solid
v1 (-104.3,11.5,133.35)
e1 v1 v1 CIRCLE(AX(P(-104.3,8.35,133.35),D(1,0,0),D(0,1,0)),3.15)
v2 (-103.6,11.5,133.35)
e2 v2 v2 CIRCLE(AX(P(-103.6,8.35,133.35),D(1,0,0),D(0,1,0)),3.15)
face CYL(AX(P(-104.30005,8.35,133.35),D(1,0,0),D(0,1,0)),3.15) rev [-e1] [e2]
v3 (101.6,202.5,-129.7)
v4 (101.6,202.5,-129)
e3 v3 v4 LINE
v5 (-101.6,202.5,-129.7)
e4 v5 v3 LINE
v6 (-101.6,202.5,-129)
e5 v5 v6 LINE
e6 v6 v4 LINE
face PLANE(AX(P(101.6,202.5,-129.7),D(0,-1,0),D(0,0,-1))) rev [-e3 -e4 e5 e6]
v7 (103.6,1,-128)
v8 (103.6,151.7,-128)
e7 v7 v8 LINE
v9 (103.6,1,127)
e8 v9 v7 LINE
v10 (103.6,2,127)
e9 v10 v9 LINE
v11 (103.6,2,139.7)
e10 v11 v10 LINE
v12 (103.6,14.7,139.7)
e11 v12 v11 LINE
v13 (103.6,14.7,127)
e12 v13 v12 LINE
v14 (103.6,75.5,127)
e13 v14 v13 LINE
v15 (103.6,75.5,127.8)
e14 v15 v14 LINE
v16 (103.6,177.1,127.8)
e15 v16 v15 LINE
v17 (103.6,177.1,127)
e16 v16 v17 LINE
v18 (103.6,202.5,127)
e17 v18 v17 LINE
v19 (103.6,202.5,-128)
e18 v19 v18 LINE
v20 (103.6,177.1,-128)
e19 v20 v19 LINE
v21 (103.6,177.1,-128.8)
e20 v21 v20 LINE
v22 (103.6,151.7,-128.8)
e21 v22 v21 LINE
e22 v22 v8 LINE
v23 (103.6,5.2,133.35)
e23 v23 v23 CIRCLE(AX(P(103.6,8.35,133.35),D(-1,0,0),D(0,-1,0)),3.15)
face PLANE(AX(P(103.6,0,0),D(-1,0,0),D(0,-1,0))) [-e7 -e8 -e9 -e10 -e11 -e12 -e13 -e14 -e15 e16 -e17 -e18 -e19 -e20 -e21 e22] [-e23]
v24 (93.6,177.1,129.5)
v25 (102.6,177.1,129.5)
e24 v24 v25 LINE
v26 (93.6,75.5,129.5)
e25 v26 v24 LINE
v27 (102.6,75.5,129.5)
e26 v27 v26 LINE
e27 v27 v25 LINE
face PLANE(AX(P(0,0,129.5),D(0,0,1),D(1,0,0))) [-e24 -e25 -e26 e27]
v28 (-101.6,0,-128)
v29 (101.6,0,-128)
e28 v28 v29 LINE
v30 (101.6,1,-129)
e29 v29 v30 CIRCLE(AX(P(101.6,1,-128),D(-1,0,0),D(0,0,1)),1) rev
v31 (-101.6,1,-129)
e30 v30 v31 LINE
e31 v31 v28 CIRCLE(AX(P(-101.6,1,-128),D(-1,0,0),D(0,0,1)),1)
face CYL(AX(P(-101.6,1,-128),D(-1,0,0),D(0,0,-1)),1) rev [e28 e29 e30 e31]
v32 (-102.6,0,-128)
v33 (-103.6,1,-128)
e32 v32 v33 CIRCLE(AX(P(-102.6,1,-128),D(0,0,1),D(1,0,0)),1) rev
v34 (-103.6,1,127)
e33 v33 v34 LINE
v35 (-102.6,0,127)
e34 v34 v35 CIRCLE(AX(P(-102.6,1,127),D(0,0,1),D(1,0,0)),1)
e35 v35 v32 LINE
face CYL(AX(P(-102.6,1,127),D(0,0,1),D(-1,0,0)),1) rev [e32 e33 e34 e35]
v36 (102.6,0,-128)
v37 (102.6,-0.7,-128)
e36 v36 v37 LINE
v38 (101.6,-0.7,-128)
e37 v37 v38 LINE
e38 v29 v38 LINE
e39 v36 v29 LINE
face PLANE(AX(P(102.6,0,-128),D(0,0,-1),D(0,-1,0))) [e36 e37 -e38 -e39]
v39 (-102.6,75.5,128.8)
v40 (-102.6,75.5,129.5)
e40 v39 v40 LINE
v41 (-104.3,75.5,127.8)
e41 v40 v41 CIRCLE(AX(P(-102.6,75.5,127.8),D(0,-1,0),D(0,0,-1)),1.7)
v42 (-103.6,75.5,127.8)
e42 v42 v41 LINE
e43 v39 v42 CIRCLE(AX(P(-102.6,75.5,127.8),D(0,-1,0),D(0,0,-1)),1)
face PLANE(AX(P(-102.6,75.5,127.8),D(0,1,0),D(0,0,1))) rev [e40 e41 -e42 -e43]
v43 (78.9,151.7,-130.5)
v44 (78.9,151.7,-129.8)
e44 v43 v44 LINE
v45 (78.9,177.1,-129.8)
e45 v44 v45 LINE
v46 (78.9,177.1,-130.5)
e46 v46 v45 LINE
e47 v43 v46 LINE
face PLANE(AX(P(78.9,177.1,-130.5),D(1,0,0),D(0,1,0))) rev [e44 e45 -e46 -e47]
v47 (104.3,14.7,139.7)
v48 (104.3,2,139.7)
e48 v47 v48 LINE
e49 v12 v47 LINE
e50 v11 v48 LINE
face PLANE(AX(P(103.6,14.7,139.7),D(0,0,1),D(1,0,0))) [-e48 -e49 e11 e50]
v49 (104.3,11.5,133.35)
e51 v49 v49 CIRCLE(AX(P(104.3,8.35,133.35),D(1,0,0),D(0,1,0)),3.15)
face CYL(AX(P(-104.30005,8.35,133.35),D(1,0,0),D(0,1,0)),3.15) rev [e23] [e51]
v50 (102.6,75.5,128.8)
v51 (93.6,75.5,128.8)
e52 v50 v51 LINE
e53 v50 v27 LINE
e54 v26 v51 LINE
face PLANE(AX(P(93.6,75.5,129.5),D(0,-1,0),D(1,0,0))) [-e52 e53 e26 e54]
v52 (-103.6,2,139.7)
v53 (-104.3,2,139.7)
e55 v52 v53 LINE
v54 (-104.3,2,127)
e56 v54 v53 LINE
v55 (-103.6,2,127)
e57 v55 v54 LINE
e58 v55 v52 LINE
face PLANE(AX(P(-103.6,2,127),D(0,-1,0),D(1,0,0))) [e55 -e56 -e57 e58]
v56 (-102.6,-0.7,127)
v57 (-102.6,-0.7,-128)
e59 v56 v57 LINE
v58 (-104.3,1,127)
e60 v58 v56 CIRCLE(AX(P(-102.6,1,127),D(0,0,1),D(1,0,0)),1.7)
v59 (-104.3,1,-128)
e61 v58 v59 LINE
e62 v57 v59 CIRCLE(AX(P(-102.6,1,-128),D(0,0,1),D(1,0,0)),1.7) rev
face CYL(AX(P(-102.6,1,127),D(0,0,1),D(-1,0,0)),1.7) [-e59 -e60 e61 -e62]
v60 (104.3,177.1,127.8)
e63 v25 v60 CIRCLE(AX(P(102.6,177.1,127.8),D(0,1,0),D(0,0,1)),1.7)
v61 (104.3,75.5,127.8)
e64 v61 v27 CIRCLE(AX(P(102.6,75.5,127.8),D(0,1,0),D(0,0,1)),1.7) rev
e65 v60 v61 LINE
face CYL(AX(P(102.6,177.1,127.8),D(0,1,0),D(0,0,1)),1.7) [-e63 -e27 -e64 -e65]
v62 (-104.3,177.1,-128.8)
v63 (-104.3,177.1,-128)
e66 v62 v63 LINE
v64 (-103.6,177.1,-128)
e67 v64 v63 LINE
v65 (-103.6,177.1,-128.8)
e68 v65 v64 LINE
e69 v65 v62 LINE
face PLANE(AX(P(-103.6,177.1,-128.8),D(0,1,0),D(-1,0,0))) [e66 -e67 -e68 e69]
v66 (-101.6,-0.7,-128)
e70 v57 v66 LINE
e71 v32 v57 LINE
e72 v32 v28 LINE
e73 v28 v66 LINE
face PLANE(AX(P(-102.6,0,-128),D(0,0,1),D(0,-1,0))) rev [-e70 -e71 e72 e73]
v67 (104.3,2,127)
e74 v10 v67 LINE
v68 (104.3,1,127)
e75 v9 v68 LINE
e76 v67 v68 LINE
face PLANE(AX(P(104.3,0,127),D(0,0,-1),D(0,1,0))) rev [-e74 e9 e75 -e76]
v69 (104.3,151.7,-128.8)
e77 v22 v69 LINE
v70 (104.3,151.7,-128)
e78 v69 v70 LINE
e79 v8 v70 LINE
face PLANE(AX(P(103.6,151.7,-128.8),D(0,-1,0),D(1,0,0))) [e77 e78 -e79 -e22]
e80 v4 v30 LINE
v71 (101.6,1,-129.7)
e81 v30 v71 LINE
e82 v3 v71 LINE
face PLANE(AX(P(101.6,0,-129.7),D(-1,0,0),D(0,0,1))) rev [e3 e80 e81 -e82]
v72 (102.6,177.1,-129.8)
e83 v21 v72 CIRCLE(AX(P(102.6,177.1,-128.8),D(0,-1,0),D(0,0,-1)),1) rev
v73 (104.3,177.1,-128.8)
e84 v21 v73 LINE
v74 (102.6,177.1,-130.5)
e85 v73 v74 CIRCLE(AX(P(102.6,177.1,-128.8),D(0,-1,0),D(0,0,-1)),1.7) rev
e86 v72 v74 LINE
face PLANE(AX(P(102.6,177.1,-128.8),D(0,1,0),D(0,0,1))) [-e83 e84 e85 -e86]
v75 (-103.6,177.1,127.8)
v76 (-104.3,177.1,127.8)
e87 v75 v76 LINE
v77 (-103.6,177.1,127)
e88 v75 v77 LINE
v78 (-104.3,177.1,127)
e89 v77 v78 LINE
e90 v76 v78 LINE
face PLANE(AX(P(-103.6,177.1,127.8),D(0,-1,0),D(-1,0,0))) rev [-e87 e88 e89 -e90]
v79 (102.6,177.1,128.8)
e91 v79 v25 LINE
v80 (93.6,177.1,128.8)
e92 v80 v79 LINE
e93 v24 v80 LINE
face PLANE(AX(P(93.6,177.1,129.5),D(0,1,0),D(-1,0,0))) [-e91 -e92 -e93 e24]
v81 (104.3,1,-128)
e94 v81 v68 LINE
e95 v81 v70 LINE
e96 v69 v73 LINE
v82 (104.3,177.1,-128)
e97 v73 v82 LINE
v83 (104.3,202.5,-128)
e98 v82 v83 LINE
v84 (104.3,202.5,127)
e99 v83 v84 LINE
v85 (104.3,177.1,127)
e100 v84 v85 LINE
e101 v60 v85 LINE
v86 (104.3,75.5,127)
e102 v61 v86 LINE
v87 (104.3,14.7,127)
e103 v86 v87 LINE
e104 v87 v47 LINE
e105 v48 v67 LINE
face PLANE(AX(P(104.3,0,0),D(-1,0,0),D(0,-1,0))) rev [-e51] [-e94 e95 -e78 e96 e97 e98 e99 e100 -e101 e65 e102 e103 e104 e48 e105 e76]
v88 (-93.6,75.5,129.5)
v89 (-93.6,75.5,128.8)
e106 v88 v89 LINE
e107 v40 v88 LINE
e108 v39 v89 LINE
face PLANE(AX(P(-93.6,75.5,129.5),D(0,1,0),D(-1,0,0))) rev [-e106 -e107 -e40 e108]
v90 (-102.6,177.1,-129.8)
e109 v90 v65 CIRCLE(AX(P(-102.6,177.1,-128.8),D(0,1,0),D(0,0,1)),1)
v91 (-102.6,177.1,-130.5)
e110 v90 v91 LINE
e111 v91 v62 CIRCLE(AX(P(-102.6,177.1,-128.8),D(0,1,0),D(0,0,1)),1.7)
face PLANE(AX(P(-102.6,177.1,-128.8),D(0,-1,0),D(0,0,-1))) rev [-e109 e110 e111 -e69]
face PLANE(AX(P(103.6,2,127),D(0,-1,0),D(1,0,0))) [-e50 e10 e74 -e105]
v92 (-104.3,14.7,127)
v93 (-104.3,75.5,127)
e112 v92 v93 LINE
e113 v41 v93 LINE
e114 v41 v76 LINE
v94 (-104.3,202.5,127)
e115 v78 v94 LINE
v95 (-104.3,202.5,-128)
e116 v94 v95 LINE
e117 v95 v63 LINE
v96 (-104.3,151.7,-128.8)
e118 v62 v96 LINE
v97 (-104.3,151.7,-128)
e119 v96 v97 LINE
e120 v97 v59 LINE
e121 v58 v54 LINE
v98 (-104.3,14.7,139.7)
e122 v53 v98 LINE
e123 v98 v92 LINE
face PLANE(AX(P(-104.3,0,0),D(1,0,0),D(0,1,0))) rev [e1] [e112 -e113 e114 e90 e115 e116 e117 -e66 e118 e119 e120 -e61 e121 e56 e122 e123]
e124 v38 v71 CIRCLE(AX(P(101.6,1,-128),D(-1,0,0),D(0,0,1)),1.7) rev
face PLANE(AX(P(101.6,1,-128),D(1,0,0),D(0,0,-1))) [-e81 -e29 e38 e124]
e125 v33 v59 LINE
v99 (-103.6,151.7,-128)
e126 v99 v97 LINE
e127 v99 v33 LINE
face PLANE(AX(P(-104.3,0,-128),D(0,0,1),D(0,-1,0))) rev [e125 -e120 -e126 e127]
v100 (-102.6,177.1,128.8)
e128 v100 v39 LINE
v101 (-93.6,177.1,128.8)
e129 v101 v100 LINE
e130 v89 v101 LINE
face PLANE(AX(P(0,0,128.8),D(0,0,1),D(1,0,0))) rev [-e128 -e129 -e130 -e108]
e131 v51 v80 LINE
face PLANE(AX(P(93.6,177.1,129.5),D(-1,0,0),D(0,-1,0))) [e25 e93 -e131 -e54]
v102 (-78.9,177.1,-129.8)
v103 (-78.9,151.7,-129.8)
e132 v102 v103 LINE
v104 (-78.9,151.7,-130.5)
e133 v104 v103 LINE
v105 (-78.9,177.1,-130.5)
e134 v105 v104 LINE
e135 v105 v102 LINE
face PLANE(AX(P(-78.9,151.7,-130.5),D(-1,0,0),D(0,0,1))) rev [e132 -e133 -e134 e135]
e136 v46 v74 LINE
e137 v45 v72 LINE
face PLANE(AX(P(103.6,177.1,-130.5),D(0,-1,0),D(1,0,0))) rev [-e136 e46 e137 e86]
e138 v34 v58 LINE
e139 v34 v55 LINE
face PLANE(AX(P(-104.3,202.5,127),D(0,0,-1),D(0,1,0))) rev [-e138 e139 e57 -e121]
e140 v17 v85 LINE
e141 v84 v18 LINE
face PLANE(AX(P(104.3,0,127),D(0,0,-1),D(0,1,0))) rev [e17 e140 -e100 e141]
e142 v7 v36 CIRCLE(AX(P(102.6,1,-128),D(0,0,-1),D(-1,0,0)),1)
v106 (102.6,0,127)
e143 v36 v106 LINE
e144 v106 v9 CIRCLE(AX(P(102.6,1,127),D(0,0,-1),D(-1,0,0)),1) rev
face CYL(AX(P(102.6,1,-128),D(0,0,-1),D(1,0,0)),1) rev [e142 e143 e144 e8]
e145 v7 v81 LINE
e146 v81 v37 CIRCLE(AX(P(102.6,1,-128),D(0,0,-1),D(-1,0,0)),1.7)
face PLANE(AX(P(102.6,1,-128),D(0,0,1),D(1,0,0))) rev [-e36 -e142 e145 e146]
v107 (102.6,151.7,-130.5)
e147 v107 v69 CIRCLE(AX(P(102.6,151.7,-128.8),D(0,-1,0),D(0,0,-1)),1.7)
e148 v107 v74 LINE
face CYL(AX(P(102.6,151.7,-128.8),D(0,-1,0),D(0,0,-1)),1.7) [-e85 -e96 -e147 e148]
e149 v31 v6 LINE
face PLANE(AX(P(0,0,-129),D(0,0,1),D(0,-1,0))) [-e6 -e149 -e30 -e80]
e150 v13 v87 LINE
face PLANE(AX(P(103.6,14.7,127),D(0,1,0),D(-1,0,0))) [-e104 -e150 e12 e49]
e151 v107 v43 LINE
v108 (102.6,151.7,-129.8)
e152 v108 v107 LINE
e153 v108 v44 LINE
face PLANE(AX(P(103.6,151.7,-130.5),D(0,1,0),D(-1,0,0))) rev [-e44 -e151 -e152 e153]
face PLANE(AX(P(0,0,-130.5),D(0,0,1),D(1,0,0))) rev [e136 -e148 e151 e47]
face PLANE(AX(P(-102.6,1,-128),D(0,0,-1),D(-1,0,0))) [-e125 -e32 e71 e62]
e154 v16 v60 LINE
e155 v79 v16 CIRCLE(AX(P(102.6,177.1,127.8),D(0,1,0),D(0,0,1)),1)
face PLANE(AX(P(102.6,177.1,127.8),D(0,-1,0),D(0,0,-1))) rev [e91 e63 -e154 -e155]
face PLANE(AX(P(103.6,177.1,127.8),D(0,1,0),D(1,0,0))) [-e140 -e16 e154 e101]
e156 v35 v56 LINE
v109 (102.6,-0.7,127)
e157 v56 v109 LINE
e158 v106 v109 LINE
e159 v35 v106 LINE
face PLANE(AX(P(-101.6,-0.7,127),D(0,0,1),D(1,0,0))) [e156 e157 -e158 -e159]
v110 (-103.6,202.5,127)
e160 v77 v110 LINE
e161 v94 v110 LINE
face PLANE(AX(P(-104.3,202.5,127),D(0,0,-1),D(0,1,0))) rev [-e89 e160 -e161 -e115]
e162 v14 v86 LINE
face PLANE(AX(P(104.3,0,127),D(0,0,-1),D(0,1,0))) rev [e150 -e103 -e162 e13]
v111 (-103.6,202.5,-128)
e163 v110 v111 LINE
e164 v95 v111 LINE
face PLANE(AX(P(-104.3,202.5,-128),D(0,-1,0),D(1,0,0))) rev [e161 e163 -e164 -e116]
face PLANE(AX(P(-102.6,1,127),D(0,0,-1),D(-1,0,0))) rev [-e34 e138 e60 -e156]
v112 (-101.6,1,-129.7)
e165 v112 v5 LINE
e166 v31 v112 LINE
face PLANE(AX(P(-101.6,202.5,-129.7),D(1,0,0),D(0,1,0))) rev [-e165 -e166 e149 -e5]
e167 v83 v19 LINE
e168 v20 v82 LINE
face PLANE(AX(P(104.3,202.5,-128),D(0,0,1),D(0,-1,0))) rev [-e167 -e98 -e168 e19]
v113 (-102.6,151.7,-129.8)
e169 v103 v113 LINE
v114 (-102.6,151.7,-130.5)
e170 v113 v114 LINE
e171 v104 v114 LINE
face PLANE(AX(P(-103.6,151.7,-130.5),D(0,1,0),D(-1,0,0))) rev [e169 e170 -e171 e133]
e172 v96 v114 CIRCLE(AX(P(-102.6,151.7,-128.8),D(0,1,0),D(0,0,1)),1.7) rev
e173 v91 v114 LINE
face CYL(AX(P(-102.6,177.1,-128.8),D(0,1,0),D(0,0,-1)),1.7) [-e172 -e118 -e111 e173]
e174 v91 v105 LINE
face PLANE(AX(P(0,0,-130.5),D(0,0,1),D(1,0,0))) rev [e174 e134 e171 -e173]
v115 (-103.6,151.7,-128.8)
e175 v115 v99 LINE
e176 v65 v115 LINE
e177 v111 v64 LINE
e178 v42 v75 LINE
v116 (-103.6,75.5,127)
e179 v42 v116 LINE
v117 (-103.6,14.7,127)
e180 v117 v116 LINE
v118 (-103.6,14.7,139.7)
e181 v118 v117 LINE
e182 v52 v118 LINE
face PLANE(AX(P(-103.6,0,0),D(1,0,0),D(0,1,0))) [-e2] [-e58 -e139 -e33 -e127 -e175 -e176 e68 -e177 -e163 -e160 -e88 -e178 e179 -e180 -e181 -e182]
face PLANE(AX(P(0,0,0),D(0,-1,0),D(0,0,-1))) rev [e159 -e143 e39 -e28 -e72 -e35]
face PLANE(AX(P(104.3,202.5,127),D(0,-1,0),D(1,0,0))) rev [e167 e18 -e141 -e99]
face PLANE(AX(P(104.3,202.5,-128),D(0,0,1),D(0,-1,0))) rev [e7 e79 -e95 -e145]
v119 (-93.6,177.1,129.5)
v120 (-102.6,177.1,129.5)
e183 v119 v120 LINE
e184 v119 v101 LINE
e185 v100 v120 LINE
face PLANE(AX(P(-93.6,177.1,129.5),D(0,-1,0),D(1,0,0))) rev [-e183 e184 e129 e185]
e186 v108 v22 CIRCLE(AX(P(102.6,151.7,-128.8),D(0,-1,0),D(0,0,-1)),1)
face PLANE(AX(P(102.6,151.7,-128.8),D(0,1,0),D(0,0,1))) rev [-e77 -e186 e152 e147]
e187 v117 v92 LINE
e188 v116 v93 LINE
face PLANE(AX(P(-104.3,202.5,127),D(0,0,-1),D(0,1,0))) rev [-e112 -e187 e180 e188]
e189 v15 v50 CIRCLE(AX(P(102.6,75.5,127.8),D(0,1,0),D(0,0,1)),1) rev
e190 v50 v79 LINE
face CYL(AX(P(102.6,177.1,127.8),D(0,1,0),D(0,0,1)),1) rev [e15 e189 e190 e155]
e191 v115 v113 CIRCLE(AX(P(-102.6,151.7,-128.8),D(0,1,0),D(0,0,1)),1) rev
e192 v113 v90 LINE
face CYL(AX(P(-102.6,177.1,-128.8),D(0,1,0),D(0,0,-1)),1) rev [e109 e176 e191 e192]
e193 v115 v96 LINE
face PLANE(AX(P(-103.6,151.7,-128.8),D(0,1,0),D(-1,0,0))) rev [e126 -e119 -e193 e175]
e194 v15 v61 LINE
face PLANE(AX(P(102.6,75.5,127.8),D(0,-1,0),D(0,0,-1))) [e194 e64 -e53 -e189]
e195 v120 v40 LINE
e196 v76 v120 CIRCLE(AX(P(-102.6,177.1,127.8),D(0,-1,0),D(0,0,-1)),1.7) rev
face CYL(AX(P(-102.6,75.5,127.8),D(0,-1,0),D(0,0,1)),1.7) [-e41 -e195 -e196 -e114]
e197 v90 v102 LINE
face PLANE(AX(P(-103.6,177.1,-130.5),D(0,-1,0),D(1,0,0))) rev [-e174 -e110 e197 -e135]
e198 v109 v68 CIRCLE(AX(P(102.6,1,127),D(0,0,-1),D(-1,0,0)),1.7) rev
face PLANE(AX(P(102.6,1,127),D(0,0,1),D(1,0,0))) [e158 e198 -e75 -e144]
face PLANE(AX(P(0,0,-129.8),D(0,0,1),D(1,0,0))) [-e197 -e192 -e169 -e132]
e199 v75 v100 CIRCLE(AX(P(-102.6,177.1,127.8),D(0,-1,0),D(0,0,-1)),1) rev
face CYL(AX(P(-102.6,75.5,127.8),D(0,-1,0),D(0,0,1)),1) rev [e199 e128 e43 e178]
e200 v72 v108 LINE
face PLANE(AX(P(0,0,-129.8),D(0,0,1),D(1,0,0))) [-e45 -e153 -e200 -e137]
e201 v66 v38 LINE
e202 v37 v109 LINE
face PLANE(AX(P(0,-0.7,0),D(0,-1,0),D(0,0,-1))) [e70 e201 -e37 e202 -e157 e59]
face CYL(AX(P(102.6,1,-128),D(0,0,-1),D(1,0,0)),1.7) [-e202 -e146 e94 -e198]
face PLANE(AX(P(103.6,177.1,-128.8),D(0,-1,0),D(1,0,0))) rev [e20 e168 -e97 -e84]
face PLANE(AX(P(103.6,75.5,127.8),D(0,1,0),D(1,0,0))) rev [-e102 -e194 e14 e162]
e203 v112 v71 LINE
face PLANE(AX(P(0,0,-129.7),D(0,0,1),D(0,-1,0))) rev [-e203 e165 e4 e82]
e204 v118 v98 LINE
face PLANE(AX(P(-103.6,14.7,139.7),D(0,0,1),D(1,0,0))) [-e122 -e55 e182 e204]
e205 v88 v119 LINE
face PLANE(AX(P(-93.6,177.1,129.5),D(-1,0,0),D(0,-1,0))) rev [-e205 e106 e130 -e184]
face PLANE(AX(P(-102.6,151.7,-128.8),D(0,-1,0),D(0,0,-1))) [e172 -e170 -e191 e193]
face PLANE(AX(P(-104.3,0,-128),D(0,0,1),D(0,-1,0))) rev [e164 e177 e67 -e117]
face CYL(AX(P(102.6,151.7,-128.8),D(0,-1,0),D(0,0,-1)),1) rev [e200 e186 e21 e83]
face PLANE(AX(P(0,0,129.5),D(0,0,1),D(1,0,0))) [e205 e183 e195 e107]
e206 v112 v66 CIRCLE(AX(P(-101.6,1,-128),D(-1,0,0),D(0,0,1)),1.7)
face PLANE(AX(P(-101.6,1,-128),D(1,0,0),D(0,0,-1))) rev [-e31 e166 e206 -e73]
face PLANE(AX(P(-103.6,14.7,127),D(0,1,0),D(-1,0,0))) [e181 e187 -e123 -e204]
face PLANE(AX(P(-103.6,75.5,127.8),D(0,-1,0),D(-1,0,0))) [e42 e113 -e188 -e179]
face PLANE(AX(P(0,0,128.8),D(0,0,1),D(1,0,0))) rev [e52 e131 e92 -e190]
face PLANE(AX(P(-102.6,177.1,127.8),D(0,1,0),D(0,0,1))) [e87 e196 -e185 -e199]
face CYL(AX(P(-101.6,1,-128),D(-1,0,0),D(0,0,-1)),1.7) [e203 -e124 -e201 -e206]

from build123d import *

# Parameters (mm, degrees)
SKETCH2_W           = 203.2
SKETCH2_H           = 254
BASE_FLANGE1_DEPTH  = 0.7
EDGE_FLANGE4_DEPTH  = 203.2
EDGE_FLANGE5_DEPTH  = 255
EDGE_FLANGE6_DEPTH  = 255
EDGE_FLANGE7_DEPTH  = 25.4
EDGE_FLANGE9_DEPTH  = 25.4
EDGE_FLANGE10_DEPTH = 101.6
EDGE_FLANGE11_DEPTH = 101.6
SKETCH76_W          = 12.7
SKETCH76_H          = 12.7
TAB1_DEPTH          = 0.7
SKETCH79_W          = 12.7
SKETCH79_H          = 12.7
TAB2_DEPTH          = 0.7
SKETCH86_R          = 3.15
CUT_EXTRUDE3_DEPTH  = 323.546585783


# Sheet-metal steps are written as plain solids
with BuildPart() as part:
    # Sketch2 → Base-Flange1 (new body)
    with BuildSketch(Plane(origin=(0, 0, 0), x_dir=(1, 0, 0), z_dir=(0, 1, 0))):
        Rectangle(SKETCH2_W, SKETCH2_H)
    extrude(amount=-BASE_FLANGE1_DEPTH)

    # Edge-Flange4 section (across the edge) → Edge-Flange4 (add)
    with BuildSketch(Plane(origin=(101.6, 0, -129), x_dir=(0, 0, 1), z_dir=(-1, 0, 0))):
        with BuildLine():
            Line((-0.7, 1), (-0.7, 202.5))
            Line((-0.7, 202.5), (0, 202.5))
            Line((0, 202.5), (0, 1))
            ThreePointArc((0, 1), (0.292893219, 0.292893219), (1, 0))
            Line((1, 0), (2, 0))
            Line((2, 0), (2, -0.7))
            Line((2, -0.7), (1, -0.7))
            ThreePointArc((1, -0.7), (-0.202081528, -0.202081528), (-0.7, 1))
        make_face()
    extrude(amount=EDGE_FLANGE4_DEPTH)

    # Edge-Flange5 section (across the edge) → Edge-Flange5 (add)
    with BuildSketch(Plane(origin=(-103.6, 0, -128), x_dir=(1, 0, 0), z_dir=(0, 0, 1))):
        with BuildLine():
            Line((-0.7, 1), (-0.7, 202.5))
            Line((-0.7, 202.5), (0, 202.5))
            Line((0, 202.5), (0, 1))
            ThreePointArc((0, 1), (0.292893219, 0.292893219), (1, 0))
            Line((1, 0), (2, 0))
            Line((2, 0), (2, -0.7))
            Line((2, -0.7), (1, -0.7))
            ThreePointArc((1, -0.7), (-0.202081528, -0.202081528), (-0.7, 1))
        make_face()
    extrude(amount=EDGE_FLANGE5_DEPTH)

    # Edge-Flange6 section (across the edge) → Edge-Flange6 (add)
    with BuildSketch(Plane(origin=(103.6, 0, 127), x_dir=(-1, 0, 0), z_dir=(0, 0, -1))):
        with BuildLine():
            Line((-0.7, 1), (-0.7, 202.5))
            Line((-0.7, 202.5), (0, 202.5))
            Line((0, 202.5), (0, 1))
            ThreePointArc((0, 1), (0.292893219, 0.292893219), (1, 0))
            Line((1, 0), (2, 0))
            Line((2, 0), (2, -0.7))
            Line((2, -0.7), (1, -0.7))
            ThreePointArc((1, -0.7), (-0.202081528, -0.202081528), (-0.7, 1))
        make_face()
    extrude(amount=EDGE_FLANGE6_DEPTH)

    # Edge-Flange7 section (across the edge) → Edge-Flange7 (add)
    with BuildSketch(Plane(origin=(-103.6, 151.7, -129.8), x_dir=(0, 0, 1), z_dir=(0, 1, 0))):
        with BuildLine():
            Line((-0.7, 1), (-0.7, 24.7))
            Line((-0.7, 24.7), (0, 24.7))
            Line((0, 24.7), (0, 1))
            ThreePointArc((0, 1), (0.292893219, 0.292893219), (1, 0))
            Line((1, 0), (1.8, 0))
            Line((1.8, 0), (1.8, -0.7))
            Line((1.8, -0.7), (1, -0.7))
            ThreePointArc((1, -0.7), (-0.202081528, -0.202081528), (-0.7, 1))
        make_face()
    extrude(amount=EDGE_FLANGE7_DEPTH)

    # Edge-Flange9 section (across the edge) → Edge-Flange9 (add)
    with BuildSketch(Plane(origin=(103.6, 177.1, -129.8), x_dir=(0, 0, 1), z_dir=(0, -1, 0))):
        with BuildLine():
            Line((-0.7, 1), (-0.7, 24.7))
            Line((-0.7, 24.7), (0, 24.7))
            Line((0, 24.7), (0, 1))
            ThreePointArc((0, 1), (0.292893219, 0.292893219), (1, 0))
            Line((1, 0), (1.8, 0))
            Line((1.8, 0), (1.8, -0.7))
            Line((1.8, -0.7), (1, -0.7))
            ThreePointArc((1, -0.7), (-0.202081528, -0.202081528), (-0.7, 1))
        make_face()
    extrude(amount=EDGE_FLANGE9_DEPTH)

    # Edge-Flange10 section (across the edge) → Edge-Flange10 (add)
    with BuildSketch(Plane(origin=(103.6, 75.5, 128.8), x_dir=(0, 0, -1), z_dir=(0, 1, 0))):
        with BuildLine():
            Line((-0.7, 1), (-0.7, 10))
            Line((-0.7, 10), (0, 10))
            Line((0, 10), (0, 1))
            ThreePointArc((0, 1), (0.292893219, 0.292893219), (1, 0))
            Line((1, 0), (1.8, 0))
            Line((1.8, 0), (1.8, -0.7))
            Line((1.8, -0.7), (1, -0.7))
            ThreePointArc((1, -0.7), (-0.202081528, -0.202081528), (-0.7, 1))
        make_face()
    extrude(amount=EDGE_FLANGE10_DEPTH)

    # Edge-Flange11 section (across the edge) → Edge-Flange11 (add)
    with BuildSketch(Plane(origin=(-103.6, 177.1, 128.8), x_dir=(0, 0, -1), z_dir=(0, -1, 0))):
        with BuildLine():
            Line((-0.7, 1), (-0.7, 10))
            Line((-0.7, 10), (0, 10))
            Line((0, 10), (0, 1))
            ThreePointArc((0, 1), (0.292893219, 0.292893219), (1, 0))
            Line((1, 0), (1.8, 0))
            Line((1.8, 0), (1.8, -0.7))
            Line((1.8, -0.7), (1, -0.7))
            ThreePointArc((1, -0.7), (-0.202081528, -0.202081528), (-0.7, 1))
        make_face()
    extrude(amount=EDGE_FLANGE11_DEPTH)

    # Sketch76 → Tab1 (add)
    with BuildSketch(Plane.ZY.offset(104.3)):
        with Locations((133.35, 8.35)):
            Rectangle(SKETCH76_W, SKETCH76_H)
    extrude(amount=-TAB1_DEPTH)

    # Sketch79 → Tab2 (add)
    with BuildSketch(Plane(origin=(104.3, 0, 0), x_dir=(0, 0, -1), z_dir=(1, 0, 0))):
        with Locations((-133.35, 8.35)):
            Rectangle(SKETCH79_W, SKETCH79_H)
    extrude(amount=-TAB2_DEPTH)

    # Sketch86 → Cut-Extrude3 (cut, through all)
    with BuildSketch(Plane(origin=(104.3, 0, 0), x_dir=(0, 0, -1), z_dir=(1, 0, 0))):
        with Locations(Location((-133.35, 8.35, 0), (0, 0, 90))):
            Circle(SKETCH86_R)
    extrude(amount=-CUT_EXTRUDE3_DEPTH, mode=Mode.SUBTRACT)


solid = part.part
